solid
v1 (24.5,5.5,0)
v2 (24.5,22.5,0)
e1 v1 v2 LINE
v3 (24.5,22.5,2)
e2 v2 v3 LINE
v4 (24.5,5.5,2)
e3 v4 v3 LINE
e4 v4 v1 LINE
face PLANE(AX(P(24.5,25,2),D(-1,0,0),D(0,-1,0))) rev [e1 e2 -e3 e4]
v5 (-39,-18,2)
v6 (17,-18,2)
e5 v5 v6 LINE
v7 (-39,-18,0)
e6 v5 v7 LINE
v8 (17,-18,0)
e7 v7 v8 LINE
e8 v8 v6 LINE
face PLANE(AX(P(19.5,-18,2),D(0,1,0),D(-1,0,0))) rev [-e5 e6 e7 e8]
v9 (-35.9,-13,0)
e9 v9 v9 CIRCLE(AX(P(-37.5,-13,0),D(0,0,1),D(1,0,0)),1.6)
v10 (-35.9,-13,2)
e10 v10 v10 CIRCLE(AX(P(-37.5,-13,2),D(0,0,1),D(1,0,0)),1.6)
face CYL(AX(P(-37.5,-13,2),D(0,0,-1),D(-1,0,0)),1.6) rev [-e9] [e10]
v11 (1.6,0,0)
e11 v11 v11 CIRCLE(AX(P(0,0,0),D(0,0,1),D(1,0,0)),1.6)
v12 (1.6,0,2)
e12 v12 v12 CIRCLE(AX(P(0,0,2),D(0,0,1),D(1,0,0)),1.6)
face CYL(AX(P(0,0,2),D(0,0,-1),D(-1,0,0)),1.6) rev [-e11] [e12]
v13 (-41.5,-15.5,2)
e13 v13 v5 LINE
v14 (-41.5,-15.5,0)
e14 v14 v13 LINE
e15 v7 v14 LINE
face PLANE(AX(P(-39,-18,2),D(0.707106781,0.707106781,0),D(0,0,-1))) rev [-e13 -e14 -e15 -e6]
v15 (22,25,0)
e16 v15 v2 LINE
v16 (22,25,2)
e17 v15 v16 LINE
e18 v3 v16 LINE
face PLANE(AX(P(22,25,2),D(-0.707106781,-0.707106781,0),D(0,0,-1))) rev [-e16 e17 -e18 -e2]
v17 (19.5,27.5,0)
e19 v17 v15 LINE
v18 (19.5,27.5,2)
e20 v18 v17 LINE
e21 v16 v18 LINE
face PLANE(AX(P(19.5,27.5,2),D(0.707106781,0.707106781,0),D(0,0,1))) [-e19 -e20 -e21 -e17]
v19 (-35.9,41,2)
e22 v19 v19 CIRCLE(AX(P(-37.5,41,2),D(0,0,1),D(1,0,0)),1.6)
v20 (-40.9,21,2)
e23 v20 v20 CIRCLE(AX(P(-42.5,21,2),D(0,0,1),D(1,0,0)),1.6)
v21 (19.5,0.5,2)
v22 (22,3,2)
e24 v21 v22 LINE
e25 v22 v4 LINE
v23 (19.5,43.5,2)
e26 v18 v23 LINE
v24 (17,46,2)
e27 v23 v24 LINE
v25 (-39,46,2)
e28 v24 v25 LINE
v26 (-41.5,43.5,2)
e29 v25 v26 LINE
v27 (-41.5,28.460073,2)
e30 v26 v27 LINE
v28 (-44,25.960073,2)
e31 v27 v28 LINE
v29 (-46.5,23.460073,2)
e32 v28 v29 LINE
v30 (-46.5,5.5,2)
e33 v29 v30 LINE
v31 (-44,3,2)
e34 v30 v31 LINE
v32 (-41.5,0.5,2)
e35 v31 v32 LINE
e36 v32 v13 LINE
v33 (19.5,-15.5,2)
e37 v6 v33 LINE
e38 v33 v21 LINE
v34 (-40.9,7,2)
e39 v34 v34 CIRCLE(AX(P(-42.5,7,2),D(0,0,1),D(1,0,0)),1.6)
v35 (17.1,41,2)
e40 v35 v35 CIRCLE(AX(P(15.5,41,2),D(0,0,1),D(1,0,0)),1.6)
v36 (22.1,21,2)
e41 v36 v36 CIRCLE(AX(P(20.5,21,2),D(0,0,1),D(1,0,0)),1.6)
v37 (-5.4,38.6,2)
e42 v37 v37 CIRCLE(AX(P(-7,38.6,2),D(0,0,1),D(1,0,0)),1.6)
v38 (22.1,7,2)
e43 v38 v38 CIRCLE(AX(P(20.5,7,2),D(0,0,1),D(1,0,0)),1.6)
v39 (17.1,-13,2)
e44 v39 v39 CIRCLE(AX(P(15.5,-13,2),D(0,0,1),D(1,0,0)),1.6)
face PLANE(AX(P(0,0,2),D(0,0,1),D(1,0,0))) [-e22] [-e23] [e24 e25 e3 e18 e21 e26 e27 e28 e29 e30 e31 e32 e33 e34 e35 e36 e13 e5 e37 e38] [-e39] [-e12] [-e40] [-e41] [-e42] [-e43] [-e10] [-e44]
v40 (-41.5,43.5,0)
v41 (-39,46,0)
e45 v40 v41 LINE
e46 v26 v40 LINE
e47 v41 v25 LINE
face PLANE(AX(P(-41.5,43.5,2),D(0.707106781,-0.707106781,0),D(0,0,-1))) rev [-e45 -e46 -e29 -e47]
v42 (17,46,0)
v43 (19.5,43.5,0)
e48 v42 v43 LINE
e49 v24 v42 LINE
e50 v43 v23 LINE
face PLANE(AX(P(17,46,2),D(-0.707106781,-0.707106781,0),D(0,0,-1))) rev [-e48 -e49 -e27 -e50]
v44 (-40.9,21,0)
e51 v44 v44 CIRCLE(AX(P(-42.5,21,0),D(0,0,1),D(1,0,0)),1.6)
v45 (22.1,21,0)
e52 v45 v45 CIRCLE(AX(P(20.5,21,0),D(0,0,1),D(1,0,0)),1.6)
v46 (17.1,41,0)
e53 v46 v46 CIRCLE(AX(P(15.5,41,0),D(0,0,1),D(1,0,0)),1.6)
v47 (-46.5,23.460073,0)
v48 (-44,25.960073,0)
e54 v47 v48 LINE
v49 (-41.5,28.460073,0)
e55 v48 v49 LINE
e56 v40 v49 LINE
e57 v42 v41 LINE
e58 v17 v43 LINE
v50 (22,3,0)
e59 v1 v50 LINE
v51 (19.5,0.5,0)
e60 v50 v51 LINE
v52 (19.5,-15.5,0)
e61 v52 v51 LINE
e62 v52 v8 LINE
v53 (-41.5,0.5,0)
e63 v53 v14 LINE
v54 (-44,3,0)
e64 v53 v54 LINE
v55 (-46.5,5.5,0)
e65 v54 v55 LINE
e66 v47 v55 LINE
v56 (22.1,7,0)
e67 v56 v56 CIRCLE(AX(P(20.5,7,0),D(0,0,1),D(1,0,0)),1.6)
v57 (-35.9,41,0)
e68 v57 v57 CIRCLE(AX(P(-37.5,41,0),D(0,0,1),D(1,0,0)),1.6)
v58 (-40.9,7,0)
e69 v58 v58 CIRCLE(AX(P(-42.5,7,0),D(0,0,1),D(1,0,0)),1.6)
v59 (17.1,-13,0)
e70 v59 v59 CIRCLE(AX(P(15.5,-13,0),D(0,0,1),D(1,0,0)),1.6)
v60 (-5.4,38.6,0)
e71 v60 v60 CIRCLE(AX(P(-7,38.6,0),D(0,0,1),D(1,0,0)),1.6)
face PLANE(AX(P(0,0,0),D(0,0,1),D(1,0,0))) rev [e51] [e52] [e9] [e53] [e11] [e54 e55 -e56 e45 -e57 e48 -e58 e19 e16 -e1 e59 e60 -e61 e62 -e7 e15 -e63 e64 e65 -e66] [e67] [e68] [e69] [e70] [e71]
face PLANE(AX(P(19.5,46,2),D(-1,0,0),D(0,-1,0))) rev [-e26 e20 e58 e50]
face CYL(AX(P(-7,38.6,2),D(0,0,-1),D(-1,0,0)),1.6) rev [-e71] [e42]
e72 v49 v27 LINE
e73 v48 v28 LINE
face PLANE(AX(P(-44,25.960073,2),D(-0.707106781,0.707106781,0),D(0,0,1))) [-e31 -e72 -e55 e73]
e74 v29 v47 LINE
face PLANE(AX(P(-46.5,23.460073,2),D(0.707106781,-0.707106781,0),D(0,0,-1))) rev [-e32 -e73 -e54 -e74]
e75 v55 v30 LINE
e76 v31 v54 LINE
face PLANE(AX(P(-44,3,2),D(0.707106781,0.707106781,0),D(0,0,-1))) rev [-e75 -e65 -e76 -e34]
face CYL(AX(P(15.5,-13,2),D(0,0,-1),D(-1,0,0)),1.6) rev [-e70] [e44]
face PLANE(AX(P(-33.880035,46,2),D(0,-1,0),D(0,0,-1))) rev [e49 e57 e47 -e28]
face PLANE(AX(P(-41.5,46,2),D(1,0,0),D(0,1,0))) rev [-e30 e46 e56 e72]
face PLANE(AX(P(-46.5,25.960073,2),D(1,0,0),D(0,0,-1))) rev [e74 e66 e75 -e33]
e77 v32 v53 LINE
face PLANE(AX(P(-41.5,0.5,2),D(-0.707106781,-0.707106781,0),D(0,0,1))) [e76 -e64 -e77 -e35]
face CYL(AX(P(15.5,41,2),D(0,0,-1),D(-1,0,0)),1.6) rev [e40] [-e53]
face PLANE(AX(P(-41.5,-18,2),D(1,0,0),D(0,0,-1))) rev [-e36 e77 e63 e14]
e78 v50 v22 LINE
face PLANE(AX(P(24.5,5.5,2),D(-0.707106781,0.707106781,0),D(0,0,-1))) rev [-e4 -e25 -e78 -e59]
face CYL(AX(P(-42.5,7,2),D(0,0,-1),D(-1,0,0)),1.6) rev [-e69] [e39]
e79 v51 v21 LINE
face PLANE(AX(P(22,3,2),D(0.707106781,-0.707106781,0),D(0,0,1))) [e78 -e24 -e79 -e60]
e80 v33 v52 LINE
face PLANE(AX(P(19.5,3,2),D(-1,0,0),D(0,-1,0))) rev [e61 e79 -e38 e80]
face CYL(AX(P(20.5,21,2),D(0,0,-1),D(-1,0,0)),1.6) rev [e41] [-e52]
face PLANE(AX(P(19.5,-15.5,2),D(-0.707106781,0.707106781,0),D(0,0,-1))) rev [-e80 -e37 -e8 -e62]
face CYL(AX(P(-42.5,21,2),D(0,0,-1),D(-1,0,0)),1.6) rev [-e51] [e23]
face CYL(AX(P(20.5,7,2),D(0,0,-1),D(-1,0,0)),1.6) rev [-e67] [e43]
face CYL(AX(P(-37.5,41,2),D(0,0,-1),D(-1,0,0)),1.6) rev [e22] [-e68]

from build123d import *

# Parameters (mm, degrees)
SKETCH_1_W      = 38
SKETCH_1_H      = 54
SKETCH_1_R      = 1.6
EXTRUDE_1_DEPTH = 2
SKETCH_4_R      = 1.6
EXTRUDE_2_DEPTH = 2
CHAMFER_1_SIZE  = 2.5


with BuildPart() as part:
    # 草图1 → 凸台-拉伸1 (new body)
    with BuildSketch(Plane.XY):
        with Locations((-11, 14)):
            Rectangle(SKETCH_1_W, SKETCH_1_H)
        Circle(SKETCH_1_R, mode=Mode.SUBTRACT)
        with Locations((-7, 38.6)):
            Circle(SKETCH_1_R, mode=Mode.SUBTRACT)
    extrude(amount=EXTRUDE_1_DEPTH)

    # 草图4 → 凸台-拉伸2 (add)
    with BuildSketch(Plane.XY):
        Polygon((-33.880035193, 46), (19.5, 46), (19.5, 25), (24.5, 25), (24.5, 3), (19.5, 3), (19.5, -18), (-41.5, -18), (-41.5, 2.119651453), (-41.5, 3), (-46.5, 3), (-46.5, 25.960072655), (-41.5, 25.960072655), (-41.5, 46), align=None)
        with Locations((-37.5, 41)):
            Circle(SKETCH_4_R, mode=Mode.SUBTRACT)
        with Locations((15.5, -13)):
            Circle(SKETCH_4_R, mode=Mode.SUBTRACT)
        with Locations((-37.5, -13)):
            Circle(SKETCH_4_R, mode=Mode.SUBTRACT)
        with Locations((15.5, 41)):
            Circle(SKETCH_4_R, mode=Mode.SUBTRACT)
        with Locations((-42.5, 21)):
            Circle(SKETCH_4_R, mode=Mode.SUBTRACT)
        with Locations((20.5, 7)):
            Circle(SKETCH_4_R, mode=Mode.SUBTRACT)
        with Locations((-42.5, 7)):
            Circle(SKETCH_4_R, mode=Mode.SUBTRACT)
        with Locations((20.5, 21)):
            Circle(SKETCH_4_R, mode=Mode.SUBTRACT)
        with Locations((-7, 38.6)):
            Circle(SKETCH_4_R, mode=Mode.SUBTRACT)
        Circle(SKETCH_4_R, mode=Mode.SUBTRACT)
    extrude(amount=EXTRUDE_2_DEPTH)

    # Chamfer 1
    chamfer_1_edges = [part.edges().sort_by_distance(p)[0] for p in [
        (19.5, -18, 1),
        (19.5, 3, 1),
        (24.5, 3, 1),
        (24.5, 25, 1),
        (19.5, 25, 1),
        (19.5, 46, 1),
        (-41.5, -18, 1),
        (-41.5, 3, 1),
        (-46.5, 3, 1),
        (-41.5, 25.960072655, 1),
        (-46.5, 25.960072655, 1),
        (-41.5, 46, 1),
    ]]
    chamfer(chamfer_1_edges, length=CHAMFER_1_SIZE - 0.0001)  # a hair under: the kernel refuses the full size


solid = part.part
